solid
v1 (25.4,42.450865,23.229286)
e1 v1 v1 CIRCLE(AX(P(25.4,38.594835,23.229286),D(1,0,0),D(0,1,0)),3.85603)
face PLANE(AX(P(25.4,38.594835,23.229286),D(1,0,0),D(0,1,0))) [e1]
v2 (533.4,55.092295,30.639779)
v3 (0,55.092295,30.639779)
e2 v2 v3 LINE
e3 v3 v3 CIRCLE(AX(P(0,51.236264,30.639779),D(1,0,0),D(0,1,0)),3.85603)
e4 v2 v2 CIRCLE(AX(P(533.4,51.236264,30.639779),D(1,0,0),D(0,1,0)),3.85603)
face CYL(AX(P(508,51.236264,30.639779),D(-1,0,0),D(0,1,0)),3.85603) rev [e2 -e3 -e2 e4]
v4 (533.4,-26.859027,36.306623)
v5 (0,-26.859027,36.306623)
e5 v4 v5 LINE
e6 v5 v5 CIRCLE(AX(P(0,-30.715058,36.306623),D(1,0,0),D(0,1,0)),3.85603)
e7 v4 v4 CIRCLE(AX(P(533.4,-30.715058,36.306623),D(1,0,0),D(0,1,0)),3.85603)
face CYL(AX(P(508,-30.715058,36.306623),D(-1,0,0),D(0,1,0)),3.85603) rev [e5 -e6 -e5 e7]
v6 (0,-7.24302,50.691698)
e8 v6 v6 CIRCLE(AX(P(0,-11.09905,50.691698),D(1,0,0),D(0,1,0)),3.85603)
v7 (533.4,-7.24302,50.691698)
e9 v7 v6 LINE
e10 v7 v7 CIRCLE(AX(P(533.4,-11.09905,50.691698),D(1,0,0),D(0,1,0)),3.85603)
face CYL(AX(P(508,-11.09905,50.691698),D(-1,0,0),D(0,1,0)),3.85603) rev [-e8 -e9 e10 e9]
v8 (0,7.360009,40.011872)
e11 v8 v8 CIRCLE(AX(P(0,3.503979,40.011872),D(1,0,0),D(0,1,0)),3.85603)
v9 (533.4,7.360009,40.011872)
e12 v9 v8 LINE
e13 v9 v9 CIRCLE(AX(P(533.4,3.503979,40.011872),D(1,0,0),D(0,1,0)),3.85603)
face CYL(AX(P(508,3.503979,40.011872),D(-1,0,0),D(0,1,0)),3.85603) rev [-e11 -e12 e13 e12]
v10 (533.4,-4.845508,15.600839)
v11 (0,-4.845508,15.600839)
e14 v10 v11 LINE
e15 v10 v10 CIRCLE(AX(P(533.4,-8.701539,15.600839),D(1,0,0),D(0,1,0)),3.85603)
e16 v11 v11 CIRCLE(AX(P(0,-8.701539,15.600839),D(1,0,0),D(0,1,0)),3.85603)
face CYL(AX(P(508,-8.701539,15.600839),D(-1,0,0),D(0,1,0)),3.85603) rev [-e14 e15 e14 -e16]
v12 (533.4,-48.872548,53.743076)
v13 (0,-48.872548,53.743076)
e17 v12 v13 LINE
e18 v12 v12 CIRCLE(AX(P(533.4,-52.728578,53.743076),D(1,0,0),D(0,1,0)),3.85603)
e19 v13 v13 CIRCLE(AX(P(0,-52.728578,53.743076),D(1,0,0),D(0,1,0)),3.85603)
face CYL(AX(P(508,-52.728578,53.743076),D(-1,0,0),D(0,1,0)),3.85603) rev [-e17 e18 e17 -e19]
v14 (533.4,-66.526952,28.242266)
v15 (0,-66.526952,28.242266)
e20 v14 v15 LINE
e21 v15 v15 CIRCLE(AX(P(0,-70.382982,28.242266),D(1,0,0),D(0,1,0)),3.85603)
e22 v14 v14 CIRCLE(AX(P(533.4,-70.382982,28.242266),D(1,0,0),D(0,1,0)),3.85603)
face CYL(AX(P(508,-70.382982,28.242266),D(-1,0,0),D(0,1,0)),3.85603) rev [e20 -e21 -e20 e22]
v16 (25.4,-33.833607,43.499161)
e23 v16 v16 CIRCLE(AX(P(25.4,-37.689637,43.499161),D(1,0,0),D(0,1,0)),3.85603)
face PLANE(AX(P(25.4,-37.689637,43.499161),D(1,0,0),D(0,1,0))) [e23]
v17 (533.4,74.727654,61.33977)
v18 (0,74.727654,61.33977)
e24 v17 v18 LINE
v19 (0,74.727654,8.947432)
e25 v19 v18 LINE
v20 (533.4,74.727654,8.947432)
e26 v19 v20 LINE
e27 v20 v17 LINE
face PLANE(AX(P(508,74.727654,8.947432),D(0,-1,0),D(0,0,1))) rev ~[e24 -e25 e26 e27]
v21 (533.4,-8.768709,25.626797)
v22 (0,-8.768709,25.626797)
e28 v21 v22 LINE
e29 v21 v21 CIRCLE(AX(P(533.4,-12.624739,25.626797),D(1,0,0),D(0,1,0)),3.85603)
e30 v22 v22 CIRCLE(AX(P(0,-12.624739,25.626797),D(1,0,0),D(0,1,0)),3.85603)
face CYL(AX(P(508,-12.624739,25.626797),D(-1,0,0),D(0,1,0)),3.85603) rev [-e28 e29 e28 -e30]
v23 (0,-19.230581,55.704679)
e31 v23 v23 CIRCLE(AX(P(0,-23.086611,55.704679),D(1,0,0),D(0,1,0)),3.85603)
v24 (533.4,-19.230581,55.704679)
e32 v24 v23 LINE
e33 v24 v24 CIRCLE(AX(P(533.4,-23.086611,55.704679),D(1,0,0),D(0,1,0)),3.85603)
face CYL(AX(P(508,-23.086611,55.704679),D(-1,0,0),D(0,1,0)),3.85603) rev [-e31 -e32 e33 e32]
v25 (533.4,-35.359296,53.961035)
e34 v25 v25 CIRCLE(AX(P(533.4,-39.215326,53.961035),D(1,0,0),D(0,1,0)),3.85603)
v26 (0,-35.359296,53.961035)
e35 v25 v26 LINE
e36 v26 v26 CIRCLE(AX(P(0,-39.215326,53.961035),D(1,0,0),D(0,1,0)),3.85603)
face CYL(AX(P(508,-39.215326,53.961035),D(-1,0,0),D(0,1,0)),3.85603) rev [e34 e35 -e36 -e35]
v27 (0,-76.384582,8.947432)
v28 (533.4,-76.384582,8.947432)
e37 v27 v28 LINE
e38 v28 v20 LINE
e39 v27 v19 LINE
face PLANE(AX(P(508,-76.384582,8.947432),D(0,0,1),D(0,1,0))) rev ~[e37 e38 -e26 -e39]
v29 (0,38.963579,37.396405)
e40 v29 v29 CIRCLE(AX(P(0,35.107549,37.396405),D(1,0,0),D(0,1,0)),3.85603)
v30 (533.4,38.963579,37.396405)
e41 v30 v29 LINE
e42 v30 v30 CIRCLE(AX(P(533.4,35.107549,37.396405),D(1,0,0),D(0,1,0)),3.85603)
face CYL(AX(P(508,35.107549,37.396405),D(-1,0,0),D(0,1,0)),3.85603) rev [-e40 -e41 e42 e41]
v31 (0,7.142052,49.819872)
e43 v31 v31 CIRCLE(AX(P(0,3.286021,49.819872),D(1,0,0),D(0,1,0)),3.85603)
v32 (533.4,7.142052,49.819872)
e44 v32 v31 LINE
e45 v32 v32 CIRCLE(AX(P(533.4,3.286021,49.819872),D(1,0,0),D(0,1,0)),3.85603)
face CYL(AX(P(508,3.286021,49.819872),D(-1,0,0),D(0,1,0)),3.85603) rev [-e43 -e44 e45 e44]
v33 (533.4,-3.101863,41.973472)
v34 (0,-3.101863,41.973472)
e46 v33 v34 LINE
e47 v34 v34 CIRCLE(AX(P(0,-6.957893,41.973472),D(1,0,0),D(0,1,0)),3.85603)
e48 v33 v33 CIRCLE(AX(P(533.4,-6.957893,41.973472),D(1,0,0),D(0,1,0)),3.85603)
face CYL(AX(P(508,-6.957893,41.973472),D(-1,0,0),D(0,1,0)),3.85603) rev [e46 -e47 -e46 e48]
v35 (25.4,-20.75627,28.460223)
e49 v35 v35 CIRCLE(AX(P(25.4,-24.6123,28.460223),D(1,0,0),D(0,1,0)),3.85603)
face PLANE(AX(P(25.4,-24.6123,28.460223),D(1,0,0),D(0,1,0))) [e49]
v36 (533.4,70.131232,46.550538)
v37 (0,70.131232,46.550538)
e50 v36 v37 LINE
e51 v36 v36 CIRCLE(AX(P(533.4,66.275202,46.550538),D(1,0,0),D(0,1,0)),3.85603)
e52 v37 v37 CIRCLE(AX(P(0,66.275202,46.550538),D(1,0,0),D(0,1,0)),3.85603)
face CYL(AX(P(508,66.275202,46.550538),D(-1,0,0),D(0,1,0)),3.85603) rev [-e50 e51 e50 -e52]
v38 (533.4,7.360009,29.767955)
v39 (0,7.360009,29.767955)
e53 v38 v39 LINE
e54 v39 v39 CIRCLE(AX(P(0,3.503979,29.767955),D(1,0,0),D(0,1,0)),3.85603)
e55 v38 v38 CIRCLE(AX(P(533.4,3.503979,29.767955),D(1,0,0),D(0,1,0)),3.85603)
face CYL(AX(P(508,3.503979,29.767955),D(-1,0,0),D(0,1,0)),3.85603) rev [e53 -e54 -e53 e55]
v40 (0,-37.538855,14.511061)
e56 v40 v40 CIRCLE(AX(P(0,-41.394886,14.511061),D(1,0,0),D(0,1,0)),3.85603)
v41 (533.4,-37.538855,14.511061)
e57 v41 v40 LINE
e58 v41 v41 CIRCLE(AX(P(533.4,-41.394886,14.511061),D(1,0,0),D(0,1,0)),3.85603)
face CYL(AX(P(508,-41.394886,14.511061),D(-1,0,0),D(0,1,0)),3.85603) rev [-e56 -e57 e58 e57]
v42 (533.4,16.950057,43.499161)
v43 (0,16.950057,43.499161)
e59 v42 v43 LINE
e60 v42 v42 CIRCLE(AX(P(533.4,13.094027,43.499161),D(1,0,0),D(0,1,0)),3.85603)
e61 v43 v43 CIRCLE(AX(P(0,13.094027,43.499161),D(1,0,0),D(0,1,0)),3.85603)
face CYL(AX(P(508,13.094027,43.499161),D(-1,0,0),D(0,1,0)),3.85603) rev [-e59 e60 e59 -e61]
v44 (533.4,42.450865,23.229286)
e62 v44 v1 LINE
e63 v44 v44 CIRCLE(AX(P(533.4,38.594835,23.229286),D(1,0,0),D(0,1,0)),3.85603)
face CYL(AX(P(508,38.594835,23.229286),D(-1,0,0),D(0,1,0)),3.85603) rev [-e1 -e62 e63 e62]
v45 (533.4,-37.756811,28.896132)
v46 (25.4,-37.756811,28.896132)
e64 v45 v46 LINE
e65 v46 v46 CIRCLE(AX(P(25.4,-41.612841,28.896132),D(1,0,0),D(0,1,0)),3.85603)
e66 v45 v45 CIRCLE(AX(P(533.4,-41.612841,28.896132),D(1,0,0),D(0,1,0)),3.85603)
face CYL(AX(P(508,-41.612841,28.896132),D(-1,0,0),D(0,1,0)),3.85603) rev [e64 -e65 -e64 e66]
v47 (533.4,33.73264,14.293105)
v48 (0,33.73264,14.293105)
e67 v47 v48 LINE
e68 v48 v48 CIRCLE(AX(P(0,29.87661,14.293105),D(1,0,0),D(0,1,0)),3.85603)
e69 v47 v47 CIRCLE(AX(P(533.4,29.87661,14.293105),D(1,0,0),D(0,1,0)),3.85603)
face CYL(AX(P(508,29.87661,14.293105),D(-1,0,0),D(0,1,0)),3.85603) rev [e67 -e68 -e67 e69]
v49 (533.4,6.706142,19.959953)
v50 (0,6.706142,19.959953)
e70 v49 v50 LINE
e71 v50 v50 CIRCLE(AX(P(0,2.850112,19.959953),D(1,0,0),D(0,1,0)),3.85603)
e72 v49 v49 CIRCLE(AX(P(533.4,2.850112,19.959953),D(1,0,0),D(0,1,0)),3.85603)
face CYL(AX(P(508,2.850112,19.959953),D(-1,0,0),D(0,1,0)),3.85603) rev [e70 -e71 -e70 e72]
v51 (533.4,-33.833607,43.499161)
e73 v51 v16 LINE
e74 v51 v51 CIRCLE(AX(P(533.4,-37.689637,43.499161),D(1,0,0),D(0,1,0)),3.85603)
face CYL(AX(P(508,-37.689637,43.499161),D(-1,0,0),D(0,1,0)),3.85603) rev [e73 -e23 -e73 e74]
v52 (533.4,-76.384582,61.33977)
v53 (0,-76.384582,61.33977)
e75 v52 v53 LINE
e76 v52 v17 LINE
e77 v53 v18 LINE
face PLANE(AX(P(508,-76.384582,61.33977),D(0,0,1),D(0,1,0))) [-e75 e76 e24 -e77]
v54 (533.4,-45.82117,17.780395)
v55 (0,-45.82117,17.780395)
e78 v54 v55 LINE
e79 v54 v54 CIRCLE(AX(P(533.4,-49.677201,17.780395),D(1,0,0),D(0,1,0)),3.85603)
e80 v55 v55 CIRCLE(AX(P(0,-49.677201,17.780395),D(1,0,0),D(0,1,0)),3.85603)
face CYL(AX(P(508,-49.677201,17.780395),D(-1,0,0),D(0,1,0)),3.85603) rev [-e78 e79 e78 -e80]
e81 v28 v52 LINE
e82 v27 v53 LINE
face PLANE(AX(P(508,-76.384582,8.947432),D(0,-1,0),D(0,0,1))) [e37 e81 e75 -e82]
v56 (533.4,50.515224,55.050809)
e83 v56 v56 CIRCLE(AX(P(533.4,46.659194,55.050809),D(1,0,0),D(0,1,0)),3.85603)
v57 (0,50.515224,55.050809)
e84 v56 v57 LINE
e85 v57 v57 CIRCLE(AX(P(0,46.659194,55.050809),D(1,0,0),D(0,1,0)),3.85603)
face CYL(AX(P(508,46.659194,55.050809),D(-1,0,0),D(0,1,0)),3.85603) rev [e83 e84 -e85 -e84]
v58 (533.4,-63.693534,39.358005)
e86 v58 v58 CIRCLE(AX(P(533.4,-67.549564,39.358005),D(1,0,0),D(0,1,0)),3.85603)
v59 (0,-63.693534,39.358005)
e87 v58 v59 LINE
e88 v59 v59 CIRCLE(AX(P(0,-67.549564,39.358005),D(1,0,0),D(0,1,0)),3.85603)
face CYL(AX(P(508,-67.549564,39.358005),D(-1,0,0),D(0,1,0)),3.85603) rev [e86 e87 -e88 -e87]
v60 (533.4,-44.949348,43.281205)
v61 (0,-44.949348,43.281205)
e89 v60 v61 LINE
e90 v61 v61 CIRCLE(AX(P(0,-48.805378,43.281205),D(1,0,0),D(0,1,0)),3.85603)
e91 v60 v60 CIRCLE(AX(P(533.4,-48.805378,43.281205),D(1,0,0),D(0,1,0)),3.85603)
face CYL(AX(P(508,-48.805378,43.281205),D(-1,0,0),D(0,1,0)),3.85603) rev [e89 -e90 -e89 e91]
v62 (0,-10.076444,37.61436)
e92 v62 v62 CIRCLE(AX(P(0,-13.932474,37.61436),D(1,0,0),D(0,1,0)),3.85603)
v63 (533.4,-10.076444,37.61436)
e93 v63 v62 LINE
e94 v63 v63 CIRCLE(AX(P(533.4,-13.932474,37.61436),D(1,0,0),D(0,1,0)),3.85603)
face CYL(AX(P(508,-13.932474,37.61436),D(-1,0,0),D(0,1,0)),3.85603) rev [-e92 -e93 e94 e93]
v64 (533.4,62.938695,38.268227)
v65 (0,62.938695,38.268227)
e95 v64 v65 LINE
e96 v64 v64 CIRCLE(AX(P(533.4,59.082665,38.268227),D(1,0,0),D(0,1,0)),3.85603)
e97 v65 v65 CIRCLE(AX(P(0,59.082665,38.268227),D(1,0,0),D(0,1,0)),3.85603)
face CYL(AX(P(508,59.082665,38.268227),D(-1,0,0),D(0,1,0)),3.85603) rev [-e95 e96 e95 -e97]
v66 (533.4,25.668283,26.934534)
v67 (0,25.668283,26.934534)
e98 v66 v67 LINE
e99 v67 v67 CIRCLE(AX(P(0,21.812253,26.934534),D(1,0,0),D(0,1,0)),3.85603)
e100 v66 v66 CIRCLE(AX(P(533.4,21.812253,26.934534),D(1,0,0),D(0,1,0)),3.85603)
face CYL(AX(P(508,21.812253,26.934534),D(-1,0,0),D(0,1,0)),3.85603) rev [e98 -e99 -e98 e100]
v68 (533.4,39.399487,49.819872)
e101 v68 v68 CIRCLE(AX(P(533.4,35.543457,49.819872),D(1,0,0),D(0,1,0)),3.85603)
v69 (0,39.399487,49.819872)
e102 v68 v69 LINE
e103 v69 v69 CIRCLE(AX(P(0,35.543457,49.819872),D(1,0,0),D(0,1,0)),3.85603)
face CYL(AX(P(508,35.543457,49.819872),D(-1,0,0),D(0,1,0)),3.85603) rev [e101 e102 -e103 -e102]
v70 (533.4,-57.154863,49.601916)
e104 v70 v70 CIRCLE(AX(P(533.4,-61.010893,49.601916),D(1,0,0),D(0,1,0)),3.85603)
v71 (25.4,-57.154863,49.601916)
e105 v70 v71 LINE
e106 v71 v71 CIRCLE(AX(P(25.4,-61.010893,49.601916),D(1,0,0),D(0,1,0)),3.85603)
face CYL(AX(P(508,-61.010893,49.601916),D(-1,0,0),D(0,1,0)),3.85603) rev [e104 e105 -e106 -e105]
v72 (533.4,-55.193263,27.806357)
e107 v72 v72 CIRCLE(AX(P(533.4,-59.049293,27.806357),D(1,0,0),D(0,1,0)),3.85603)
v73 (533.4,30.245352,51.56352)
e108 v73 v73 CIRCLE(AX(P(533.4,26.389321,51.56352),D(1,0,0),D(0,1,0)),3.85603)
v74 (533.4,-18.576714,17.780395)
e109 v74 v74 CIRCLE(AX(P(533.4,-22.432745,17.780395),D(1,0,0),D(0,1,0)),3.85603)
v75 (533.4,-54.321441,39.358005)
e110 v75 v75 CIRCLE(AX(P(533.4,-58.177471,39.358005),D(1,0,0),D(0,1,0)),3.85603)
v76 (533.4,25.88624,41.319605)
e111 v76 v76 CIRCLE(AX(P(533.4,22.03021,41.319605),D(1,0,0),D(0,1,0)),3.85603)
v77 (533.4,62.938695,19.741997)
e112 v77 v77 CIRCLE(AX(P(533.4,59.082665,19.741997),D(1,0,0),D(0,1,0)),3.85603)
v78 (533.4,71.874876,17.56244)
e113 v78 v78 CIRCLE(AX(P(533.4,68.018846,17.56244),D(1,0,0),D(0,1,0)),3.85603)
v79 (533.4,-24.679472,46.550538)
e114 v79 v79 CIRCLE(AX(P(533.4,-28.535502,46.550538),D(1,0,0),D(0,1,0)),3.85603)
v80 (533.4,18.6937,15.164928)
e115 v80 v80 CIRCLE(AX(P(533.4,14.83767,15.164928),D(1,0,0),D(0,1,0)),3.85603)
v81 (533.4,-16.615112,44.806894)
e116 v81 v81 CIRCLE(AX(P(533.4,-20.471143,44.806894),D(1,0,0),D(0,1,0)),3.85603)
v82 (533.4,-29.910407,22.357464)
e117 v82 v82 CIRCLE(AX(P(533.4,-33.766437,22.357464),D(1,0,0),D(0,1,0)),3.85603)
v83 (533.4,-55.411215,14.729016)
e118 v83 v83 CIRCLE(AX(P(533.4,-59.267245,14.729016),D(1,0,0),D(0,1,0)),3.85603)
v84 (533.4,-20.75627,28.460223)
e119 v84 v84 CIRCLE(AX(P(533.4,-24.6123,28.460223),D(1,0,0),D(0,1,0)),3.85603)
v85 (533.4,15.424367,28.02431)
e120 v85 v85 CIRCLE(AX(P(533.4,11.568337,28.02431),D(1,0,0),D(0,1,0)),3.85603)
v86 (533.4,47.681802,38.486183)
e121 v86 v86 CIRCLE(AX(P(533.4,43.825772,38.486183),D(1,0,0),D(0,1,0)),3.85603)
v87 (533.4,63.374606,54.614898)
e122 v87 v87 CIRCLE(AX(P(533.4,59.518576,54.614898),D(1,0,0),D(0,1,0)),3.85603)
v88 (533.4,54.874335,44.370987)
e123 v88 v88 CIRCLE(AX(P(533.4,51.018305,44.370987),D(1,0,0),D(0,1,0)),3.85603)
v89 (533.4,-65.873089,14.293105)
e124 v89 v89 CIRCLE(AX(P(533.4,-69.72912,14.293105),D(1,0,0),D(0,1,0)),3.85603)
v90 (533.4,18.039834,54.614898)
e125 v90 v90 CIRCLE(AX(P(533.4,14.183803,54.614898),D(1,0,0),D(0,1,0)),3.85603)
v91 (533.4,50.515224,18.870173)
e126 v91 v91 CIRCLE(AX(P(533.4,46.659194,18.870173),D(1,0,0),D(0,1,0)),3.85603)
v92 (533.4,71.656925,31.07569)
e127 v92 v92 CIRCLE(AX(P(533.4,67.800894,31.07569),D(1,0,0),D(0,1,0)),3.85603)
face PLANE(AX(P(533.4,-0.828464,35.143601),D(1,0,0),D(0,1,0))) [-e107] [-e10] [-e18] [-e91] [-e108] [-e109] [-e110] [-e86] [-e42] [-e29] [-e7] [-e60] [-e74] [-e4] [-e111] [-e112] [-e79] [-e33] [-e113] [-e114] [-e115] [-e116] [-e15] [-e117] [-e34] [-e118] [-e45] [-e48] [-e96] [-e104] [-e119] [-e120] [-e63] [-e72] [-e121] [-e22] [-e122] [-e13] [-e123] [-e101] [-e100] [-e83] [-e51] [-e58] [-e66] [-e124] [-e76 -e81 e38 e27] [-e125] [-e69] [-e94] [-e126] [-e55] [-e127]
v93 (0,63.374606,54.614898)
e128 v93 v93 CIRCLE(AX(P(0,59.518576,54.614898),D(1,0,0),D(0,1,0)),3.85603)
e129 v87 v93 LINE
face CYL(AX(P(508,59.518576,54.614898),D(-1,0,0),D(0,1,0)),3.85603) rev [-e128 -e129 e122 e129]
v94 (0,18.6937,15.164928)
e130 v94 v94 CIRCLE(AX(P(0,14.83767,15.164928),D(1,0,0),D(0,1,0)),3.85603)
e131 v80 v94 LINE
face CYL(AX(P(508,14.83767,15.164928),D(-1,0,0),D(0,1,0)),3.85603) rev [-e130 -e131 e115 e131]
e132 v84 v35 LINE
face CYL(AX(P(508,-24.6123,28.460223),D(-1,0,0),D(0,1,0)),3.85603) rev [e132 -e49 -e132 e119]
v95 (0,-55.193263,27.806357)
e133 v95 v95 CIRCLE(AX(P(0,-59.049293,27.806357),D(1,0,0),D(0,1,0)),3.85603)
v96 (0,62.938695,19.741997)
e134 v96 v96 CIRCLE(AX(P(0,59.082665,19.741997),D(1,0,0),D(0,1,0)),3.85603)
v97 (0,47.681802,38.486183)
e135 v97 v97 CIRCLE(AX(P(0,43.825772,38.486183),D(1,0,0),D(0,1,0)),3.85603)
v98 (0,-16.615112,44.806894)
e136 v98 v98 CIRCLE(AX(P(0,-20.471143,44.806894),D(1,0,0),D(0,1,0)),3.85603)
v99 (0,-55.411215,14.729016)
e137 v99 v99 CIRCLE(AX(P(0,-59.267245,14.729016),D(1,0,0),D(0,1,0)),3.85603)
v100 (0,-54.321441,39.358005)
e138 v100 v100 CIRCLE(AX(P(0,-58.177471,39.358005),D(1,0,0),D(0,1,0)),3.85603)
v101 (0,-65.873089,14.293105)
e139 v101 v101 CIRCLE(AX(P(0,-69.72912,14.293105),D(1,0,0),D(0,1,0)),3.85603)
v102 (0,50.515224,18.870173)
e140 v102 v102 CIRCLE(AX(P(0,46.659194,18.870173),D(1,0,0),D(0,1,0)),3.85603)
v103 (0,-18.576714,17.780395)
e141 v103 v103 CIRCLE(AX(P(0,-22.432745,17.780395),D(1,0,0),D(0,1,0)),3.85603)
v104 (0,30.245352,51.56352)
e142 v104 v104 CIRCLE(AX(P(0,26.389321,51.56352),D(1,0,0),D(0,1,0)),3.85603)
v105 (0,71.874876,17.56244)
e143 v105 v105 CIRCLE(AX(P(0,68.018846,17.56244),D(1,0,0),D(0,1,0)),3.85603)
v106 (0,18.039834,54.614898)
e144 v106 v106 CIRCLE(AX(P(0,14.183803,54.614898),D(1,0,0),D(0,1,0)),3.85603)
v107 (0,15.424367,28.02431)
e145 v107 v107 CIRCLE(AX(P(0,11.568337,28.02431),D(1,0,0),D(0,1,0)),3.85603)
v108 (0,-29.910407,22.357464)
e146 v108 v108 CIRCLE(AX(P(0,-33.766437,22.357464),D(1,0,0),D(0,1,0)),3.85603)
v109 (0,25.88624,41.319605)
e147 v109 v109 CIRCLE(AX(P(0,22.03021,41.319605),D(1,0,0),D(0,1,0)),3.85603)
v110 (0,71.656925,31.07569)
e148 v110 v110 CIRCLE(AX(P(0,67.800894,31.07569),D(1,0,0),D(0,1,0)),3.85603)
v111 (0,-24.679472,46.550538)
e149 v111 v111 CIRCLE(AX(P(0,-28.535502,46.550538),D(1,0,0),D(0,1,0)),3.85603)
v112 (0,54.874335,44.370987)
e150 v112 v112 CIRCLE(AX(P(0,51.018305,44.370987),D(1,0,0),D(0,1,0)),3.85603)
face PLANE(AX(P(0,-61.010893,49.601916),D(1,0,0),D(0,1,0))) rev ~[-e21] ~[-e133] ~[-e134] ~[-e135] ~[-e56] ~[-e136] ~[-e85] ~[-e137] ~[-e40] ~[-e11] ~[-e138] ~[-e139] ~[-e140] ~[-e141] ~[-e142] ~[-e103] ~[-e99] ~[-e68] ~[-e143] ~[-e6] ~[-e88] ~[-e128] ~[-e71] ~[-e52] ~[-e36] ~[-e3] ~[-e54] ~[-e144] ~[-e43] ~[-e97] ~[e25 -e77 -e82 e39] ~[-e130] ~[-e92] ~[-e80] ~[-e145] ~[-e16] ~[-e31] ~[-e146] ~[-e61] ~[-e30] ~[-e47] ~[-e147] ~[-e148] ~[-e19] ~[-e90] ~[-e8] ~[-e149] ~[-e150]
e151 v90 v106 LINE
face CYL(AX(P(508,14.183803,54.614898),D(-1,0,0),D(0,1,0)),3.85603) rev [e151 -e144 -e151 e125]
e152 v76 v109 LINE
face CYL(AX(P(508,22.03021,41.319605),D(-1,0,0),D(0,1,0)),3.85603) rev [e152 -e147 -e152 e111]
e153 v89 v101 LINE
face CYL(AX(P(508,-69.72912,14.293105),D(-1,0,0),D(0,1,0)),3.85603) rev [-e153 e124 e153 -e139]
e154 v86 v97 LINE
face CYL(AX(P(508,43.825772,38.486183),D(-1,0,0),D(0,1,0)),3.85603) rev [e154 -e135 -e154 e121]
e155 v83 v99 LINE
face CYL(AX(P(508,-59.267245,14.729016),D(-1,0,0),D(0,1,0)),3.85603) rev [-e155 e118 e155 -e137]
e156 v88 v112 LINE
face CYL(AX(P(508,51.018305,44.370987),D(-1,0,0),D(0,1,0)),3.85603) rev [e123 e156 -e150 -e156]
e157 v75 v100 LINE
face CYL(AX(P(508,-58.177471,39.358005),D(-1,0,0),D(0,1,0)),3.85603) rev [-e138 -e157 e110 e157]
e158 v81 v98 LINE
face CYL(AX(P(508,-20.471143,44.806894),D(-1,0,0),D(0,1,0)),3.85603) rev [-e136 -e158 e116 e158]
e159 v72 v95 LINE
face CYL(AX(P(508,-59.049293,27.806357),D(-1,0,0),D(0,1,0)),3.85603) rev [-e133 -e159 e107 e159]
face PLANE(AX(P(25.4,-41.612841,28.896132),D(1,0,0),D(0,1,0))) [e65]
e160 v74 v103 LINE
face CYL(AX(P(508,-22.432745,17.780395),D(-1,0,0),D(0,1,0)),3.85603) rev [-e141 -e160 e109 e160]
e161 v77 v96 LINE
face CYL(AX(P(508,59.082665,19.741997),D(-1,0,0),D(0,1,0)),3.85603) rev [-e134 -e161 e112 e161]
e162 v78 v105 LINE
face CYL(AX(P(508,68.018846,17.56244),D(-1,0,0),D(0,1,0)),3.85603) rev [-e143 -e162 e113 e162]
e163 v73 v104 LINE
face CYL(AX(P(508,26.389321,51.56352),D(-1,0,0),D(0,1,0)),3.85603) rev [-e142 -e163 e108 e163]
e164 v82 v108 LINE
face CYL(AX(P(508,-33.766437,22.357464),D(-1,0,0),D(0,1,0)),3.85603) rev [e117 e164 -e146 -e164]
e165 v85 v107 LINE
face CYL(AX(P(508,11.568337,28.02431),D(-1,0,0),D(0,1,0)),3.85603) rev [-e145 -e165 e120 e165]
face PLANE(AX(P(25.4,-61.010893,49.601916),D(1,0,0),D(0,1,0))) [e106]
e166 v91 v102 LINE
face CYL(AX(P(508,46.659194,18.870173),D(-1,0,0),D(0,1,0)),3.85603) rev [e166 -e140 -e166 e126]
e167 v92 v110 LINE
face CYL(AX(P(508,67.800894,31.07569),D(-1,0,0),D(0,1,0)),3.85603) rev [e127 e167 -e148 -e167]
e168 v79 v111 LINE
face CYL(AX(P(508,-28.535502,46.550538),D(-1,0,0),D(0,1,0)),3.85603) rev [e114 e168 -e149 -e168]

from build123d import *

# Parameters (mm, degrees)
F0_W      = 151.1122360826
F0_H      = 52.3923374712
F0_R      = 3.8560302153
F2_DEPTH  = 508
F3_DEPTH  = 25.4
F2_FACE_W = 151.1122360826
F2_FACE_H = 52.3923374712
F2_FACE_R = 3.8560302153
F4_DEPTH  = 25.4


# Not quite as in the source:
# - the program builds the solid bodies; features that only make, move or delete a surface that nothing else refers to are left out


with BuildPart() as f2:
    # F0 (on Right) → F2 (new body)
    with BuildSketch(Plane.YZ):
        with Locations((-0.8284635842, 35.1436007768)):
            Rectangle(F0_W, F0_H)
        with Locations((-69.7291195393, 14.2931053415)):
            Circle(F0_R, mode=Mode.SUBTRACT)
        with Locations((-59.2672452331, 14.7290164605)):
            Circle(F0_R, mode=Mode.SUBTRACT)
        with Locations((-41.3948856294, 14.511060901)):
            Circle(F0_R, mode=Mode.SUBTRACT)
        with Locations((-70.3829824924, 28.2422658056)):
            Circle(F0_R, mode=Mode.SUBTRACT)
        with Locations((-59.0492933989, 27.8063565493)):
            Circle(F0_R, mode=Mode.SUBTRACT)
        with Locations((-49.6772006154, 17.7803952247)):
            Circle(F0_R, mode=Mode.SUBTRACT)
        with Locations((-41.6128411889, 28.8961324841)):
            Circle(F0_R, mode=Mode.SUBTRACT)
        with Locations((-8.7015386671, 15.6008386984)):
            Circle(F0_R, mode=Mode.SUBTRACT)
        with Locations((-33.7664373219, 22.3574638367)):
            Circle(F0_R, mode=Mode.SUBTRACT)
        with Locations((-22.432744503, 17.7803952247)):
            Circle(F0_R, mode=Mode.SUBTRACT)
        with Locations((-24.6123000979, 28.4602232277)):
            Circle(F0_R, mode=Mode.SUBTRACT)
        with Locations((-12.6247387379, 25.6267972291)):
            Circle(F0_R, mode=Mode.SUBTRACT)
        with Locations((-67.5495639443, 39.3580049276)):
            Circle(F0_R, mode=Mode.SUBTRACT)
        with Locations((-58.1774711609, 39.3580049276)):
            Circle(F0_R, mode=Mode.SUBTRACT)
        with Locations((-48.8053783774, 43.2812049985)):
            Circle(F0_R, mode=Mode.SUBTRACT)
        with Locations((-61.0108934343, 49.6019162238)):
            Circle(F0_R, mode=Mode.SUBTRACT)
        with Locations((-69.9470713735, 55.7046793401)):
            Circle(F0_R, mode=Mode.SUBTRACT)
        with Locations((-52.7285784483, 53.7430755794)):
            Circle(F0_R, mode=Mode.SUBTRACT)
        with Locations((-39.2153263092, 53.9610348642)):
            Circle(F0_R, mode=Mode.SUBTRACT)
        with Locations((-30.7150576264, 36.3066233695)):
            Circle(F0_R, mode=Mode.SUBTRACT)
        with Locations((-37.6896373928, 43.499160558)):
            Circle(F0_R, mode=Mode.SUBTRACT)
        with Locations((-20.4711426049, 44.8068939149)):
            Circle(F0_R, mode=Mode.SUBTRACT)
        with Locations((-13.9324739575, 37.6143604517)):
            Circle(F0_R, mode=Mode.SUBTRACT)
        with Locations((-6.9578932598, 41.9734716415)):
            Circle(F0_R, mode=Mode.SUBTRACT)
        with Locations((-28.5355020314, 46.5505383909)):
            Circle(F0_R, mode=Mode.SUBTRACT)
        with Locations((-23.0866111815, 55.7046793401)):
            Circle(F0_R, mode=Mode.SUBTRACT)
        with Locations((-11.0990498215, 50.6916977465)):
            Circle(F0_R, mode=Mode.SUBTRACT)
        with Locations((14.83767014, 15.1649275795)):
            Circle(F0_R, mode=Mode.SUBTRACT)
        with Locations((29.8766102642, 14.2931053415)):
            Circle(F0_R, mode=Mode.SUBTRACT)
        with Locations((2.8501115739, 19.9599526823)):
            Circle(F0_R, mode=Mode.SUBTRACT)
        with Locations((3.5039787181, 29.767954722)):
            Circle(F0_R, mode=Mode.SUBTRACT)
        with Locations((11.5683367476, 28.0243102461)):
            Circle(F0_R, mode=Mode.SUBTRACT)
        with Locations((21.8122527003, 26.9345343113)):
            Circle(F0_R, mode=Mode.SUBTRACT)
        with Locations((38.5948345065, 23.2292860746)):
            Circle(F0_R, mode=Mode.SUBTRACT)
        with Locations((46.659193933, 18.8701730222)):
            Circle(F0_R, mode=Mode.SUBTRACT)
        with Locations((51.2362644076, 30.6397788227)):
            Circle(F0_R, mode=Mode.SUBTRACT)
        with Locations((59.0826645494, 19.7419971228)):
            Circle(F0_R, mode=Mode.SUBTRACT)
        with Locations((68.0188462138, 17.5624396652)):
            Circle(F0_R, mode=Mode.SUBTRACT)
        with Locations((67.8008943796, 31.0756899416)):
            Circle(F0_R, mode=Mode.SUBTRACT)
        with Locations((3.5039787181, 40.0118716061)):
            Circle(F0_R, mode=Mode.SUBTRACT)
        with Locations((13.0940265954, 43.499160558)):
            Circle(F0_R, mode=Mode.SUBTRACT)
        with Locations((35.1075492799, 37.3964048922)):
            Circle(F0_R, mode=Mode.SUBTRACT)
        with Locations((22.0302101225, 41.3196049631)):
            Circle(F0_R, mode=Mode.SUBTRACT)
        with Locations((3.2860212959, 49.8198717833)):
            Circle(F0_R, mode=Mode.SUBTRACT)
        with Locations((14.1838034615, 54.6148978174)):
            Circle(F0_R, mode=Mode.SUBTRACT)
        with Locations((26.3893213123, 51.5635199845)):
            Circle(F0_R, mode=Mode.SUBTRACT)
        with Locations((35.5434566736, 49.8198717833)):
            Circle(F0_R, mode=Mode.SUBTRACT)
        with Locations((43.8257716596, 38.4861826897)):
            Circle(F0_R, mode=Mode.SUBTRACT)
        with Locations((51.0183051229, 44.3709865212)):
            Circle(F0_R, mode=Mode.SUBTRACT)
        with Locations((59.0826645494, 38.2682271302)):
            Circle(F0_R, mode=Mode.SUBTRACT)
        with Locations((46.659193933, 55.0508089364)):
            Circle(F0_R, mode=Mode.SUBTRACT)
        with Locations((66.2752017379, 46.5505383909)):
            Circle(F0_R, mode=Mode.SUBTRACT)
        with Locations((59.5185756683, 54.6148978174)):
            Circle(F0_R, mode=Mode.SUBTRACT)
        with Locations((-69.9470713735, 55.7046793401)):
            Circle(F0_R)
    extrude(amount=F2_DEPTH)

    # F0 (on Right) → F3 (join)
    with BuildSketch(Plane.YZ):
        with Locations((-61.0108934343, 49.6019162238)):
            Circle(F0_R)
    extrude(amount=F3_DEPTH)

    # F2_face (on face) + F0 (on Right) → F4 (join)
    with BuildSketch(Plane(origin=(508, -0.362148073, 35.2651590305), x_dir=(0, 1, 0), z_dir=(1, 0, 0))):
        with Locations((-0.4663155112, -0.1215582537)):
            Rectangle(F2_FACE_W, F2_FACE_H)
        with Locations((-69.3669714662, -20.972053689)):
            Circle(F2_FACE_R, mode=Mode.SUBTRACT)
        with Locations((-58.90509716, -20.53614257)):
            Circle(F2_FACE_R, mode=Mode.SUBTRACT)
        with Locations((-41.0327375564, -20.7540981295)):
            Circle(F2_FACE_R, mode=Mode.SUBTRACT)
        with Locations((-70.0208344194, -7.0228932249)):
            Circle(F2_FACE_R, mode=Mode.SUBTRACT)
        with Locations((-58.6871453258, -7.4588024812)):
            Circle(F2_FACE_R, mode=Mode.SUBTRACT)
        with Locations((-49.3150525424, -17.4847638058)):
            Circle(F2_FACE_R, mode=Mode.SUBTRACT)
        with Locations((-41.2506931159, -6.3690265464)):
            Circle(F2_FACE_R, mode=Mode.SUBTRACT)
        with Locations((-8.3393905941, -19.664320332)):
            Circle(F2_FACE_R, mode=Mode.SUBTRACT)
        with Locations((-33.4042892489, -12.9076951938)):
            Circle(F2_FACE_R, mode=Mode.SUBTRACT)
        with Locations((-22.07059643, -17.4847638058)):
            Circle(F2_FACE_R, mode=Mode.SUBTRACT)
        with Locations((-24.2501520249, -6.8049358027)):
            Circle(F2_FACE_R, mode=Mode.SUBTRACT)
        with Locations((-12.2625906649, -9.6383618014)):
            Circle(F2_FACE_R, mode=Mode.SUBTRACT)
        with Locations((-67.1874158713, 4.0928458972)):
            Circle(F2_FACE_R, mode=Mode.SUBTRACT)
        with Locations((-57.8153230879, 4.0928458972)):
            Circle(F2_FACE_R, mode=Mode.SUBTRACT)
        with Locations((-48.4432303044, 8.016045968)):
            Circle(F2_FACE_R, mode=Mode.SUBTRACT)
        with Locations((-60.6487453613, 14.3367571933)):
            Circle(F2_FACE_R, mode=Mode.SUBTRACT)
        with Locations((59.8807237414, 19.3497387869)):
            Circle(F2_FACE_R, mode=Mode.SUBTRACT)
        with Locations((-52.3664303753, 18.4779165489)):
            Circle(F2_FACE_R, mode=Mode.SUBTRACT)
        with Locations((-38.8531782362, 18.6958758337)):
            Circle(F2_FACE_R, mode=Mode.SUBTRACT)
        with Locations((-30.3529095533, 1.041464339)):
            Circle(F2_FACE_R, mode=Mode.SUBTRACT)
        with Locations((-37.3274893197, 8.2340015275)):
            Circle(F2_FACE_R, mode=Mode.SUBTRACT)
        with Locations((-20.1089945319, 9.5417348845)):
            Circle(F2_FACE_R, mode=Mode.SUBTRACT)
        with Locations((-13.5703258845, 2.3492014212)):
            Circle(F2_FACE_R, mode=Mode.SUBTRACT)
        with Locations((-6.5957451868, 6.7083126111)):
            Circle(F2_FACE_R, mode=Mode.SUBTRACT)
        with Locations((-28.1733539584, 11.2853793604)):
            Circle(F2_FACE_R, mode=Mode.SUBTRACT)
        with Locations((-22.7244631085, 20.4395203097)):
            Circle(F2_FACE_R, mode=Mode.SUBTRACT)
        with Locations((-10.7369017485, 15.4265387161)):
            Circle(F2_FACE_R, mode=Mode.SUBTRACT)
        with Locations((15.199818213, -20.100231451)):
            Circle(F2_FACE_R, mode=Mode.SUBTRACT)
        with Locations((30.2387583372, -20.972053689)):
            Circle(F2_FACE_R, mode=Mode.SUBTRACT)
        with Locations((3.212259647, -15.3052063482)):
            Circle(F2_FACE_R, mode=Mode.SUBTRACT)
        with Locations((3.8661267911, -5.4972043084)):
            Circle(F2_FACE_R, mode=Mode.SUBTRACT)
        with Locations((11.9304848206, -7.2408487843)):
            Circle(F2_FACE_R, mode=Mode.SUBTRACT)
        with Locations((22.1744007734, -8.3306247192)):
            Circle(F2_FACE_R, mode=Mode.SUBTRACT)
        with Locations((38.9569825795, -12.0358729558)):
            Circle(F2_FACE_R, mode=Mode.SUBTRACT)
        with Locations((47.021342006, -16.3949860083)):
            Circle(F2_FACE_R, mode=Mode.SUBTRACT)
        with Locations((51.5984124807, -4.6253802078)):
            Circle(F2_FACE_R, mode=Mode.SUBTRACT)
        with Locations((59.4448126224, -15.5231619077)):
            Circle(F2_FACE_R, mode=Mode.SUBTRACT)
        with Locations((68.3809942868, -17.7027193653)):
            Circle(F2_FACE_R, mode=Mode.SUBTRACT)
        with Locations((68.1630424526, -4.1894690888)):
            Circle(F2_FACE_R, mode=Mode.SUBTRACT)
        with Locations((3.8661267911, 4.7467125757)):
            Circle(F2_FACE_R, mode=Mode.SUBTRACT)
        with Locations((13.4561746684, 8.2340015275)):
            Circle(F2_FACE_R, mode=Mode.SUBTRACT)
        with Locations((35.469697353, 2.1312458618)):
            Circle(F2_FACE_R, mode=Mode.SUBTRACT)
        with Locations((22.3923581955, 6.0544459326)):
            Circle(F2_FACE_R, mode=Mode.SUBTRACT)
        with Locations((3.648169369, 14.5547127528)):
            Circle(F2_FACE_R, mode=Mode.SUBTRACT)
        with Locations((14.5459515345, 19.3497387869)):
            Circle(F2_FACE_R, mode=Mode.SUBTRACT)
        with Locations((26.7514693853, 16.298360954)):
            Circle(F2_FACE_R, mode=Mode.SUBTRACT)
        with Locations((35.9056047466, 14.5547127528)):
            Circle(F2_FACE_R, mode=Mode.SUBTRACT)
        with Locations((44.1879197326, 3.2210236592)):
            Circle(F2_FACE_R, mode=Mode.SUBTRACT)
        with Locations((51.3804531959, 9.1058274908)):
            Circle(F2_FACE_R, mode=Mode.SUBTRACT)
        with Locations((59.4448126224, 3.0030680997)):
            Circle(F2_FACE_R, mode=Mode.SUBTRACT)
        with Locations((47.021342006, 19.7856499059)):
            Circle(F2_FACE_R, mode=Mode.SUBTRACT)
        with Locations((66.6373498109, 11.2853793604)):
            Circle(F2_FACE_R, mode=Mode.SUBTRACT)
    with BuildSketch(Plane.YZ):
        with Locations((-41.6128411889, 28.8961324841)):
            Circle(F0_R)
        with Locations((-37.6896373928, 43.499160558)):
            Circle(F0_R)
        with Locations((-24.6123000979, 28.4602232277)):
            Circle(F0_R)
        with Locations((38.5948345065, 23.2292860746)):
            Circle(F0_R)
    extrude(amount=F4_DEPTH)


solid = f2.part
